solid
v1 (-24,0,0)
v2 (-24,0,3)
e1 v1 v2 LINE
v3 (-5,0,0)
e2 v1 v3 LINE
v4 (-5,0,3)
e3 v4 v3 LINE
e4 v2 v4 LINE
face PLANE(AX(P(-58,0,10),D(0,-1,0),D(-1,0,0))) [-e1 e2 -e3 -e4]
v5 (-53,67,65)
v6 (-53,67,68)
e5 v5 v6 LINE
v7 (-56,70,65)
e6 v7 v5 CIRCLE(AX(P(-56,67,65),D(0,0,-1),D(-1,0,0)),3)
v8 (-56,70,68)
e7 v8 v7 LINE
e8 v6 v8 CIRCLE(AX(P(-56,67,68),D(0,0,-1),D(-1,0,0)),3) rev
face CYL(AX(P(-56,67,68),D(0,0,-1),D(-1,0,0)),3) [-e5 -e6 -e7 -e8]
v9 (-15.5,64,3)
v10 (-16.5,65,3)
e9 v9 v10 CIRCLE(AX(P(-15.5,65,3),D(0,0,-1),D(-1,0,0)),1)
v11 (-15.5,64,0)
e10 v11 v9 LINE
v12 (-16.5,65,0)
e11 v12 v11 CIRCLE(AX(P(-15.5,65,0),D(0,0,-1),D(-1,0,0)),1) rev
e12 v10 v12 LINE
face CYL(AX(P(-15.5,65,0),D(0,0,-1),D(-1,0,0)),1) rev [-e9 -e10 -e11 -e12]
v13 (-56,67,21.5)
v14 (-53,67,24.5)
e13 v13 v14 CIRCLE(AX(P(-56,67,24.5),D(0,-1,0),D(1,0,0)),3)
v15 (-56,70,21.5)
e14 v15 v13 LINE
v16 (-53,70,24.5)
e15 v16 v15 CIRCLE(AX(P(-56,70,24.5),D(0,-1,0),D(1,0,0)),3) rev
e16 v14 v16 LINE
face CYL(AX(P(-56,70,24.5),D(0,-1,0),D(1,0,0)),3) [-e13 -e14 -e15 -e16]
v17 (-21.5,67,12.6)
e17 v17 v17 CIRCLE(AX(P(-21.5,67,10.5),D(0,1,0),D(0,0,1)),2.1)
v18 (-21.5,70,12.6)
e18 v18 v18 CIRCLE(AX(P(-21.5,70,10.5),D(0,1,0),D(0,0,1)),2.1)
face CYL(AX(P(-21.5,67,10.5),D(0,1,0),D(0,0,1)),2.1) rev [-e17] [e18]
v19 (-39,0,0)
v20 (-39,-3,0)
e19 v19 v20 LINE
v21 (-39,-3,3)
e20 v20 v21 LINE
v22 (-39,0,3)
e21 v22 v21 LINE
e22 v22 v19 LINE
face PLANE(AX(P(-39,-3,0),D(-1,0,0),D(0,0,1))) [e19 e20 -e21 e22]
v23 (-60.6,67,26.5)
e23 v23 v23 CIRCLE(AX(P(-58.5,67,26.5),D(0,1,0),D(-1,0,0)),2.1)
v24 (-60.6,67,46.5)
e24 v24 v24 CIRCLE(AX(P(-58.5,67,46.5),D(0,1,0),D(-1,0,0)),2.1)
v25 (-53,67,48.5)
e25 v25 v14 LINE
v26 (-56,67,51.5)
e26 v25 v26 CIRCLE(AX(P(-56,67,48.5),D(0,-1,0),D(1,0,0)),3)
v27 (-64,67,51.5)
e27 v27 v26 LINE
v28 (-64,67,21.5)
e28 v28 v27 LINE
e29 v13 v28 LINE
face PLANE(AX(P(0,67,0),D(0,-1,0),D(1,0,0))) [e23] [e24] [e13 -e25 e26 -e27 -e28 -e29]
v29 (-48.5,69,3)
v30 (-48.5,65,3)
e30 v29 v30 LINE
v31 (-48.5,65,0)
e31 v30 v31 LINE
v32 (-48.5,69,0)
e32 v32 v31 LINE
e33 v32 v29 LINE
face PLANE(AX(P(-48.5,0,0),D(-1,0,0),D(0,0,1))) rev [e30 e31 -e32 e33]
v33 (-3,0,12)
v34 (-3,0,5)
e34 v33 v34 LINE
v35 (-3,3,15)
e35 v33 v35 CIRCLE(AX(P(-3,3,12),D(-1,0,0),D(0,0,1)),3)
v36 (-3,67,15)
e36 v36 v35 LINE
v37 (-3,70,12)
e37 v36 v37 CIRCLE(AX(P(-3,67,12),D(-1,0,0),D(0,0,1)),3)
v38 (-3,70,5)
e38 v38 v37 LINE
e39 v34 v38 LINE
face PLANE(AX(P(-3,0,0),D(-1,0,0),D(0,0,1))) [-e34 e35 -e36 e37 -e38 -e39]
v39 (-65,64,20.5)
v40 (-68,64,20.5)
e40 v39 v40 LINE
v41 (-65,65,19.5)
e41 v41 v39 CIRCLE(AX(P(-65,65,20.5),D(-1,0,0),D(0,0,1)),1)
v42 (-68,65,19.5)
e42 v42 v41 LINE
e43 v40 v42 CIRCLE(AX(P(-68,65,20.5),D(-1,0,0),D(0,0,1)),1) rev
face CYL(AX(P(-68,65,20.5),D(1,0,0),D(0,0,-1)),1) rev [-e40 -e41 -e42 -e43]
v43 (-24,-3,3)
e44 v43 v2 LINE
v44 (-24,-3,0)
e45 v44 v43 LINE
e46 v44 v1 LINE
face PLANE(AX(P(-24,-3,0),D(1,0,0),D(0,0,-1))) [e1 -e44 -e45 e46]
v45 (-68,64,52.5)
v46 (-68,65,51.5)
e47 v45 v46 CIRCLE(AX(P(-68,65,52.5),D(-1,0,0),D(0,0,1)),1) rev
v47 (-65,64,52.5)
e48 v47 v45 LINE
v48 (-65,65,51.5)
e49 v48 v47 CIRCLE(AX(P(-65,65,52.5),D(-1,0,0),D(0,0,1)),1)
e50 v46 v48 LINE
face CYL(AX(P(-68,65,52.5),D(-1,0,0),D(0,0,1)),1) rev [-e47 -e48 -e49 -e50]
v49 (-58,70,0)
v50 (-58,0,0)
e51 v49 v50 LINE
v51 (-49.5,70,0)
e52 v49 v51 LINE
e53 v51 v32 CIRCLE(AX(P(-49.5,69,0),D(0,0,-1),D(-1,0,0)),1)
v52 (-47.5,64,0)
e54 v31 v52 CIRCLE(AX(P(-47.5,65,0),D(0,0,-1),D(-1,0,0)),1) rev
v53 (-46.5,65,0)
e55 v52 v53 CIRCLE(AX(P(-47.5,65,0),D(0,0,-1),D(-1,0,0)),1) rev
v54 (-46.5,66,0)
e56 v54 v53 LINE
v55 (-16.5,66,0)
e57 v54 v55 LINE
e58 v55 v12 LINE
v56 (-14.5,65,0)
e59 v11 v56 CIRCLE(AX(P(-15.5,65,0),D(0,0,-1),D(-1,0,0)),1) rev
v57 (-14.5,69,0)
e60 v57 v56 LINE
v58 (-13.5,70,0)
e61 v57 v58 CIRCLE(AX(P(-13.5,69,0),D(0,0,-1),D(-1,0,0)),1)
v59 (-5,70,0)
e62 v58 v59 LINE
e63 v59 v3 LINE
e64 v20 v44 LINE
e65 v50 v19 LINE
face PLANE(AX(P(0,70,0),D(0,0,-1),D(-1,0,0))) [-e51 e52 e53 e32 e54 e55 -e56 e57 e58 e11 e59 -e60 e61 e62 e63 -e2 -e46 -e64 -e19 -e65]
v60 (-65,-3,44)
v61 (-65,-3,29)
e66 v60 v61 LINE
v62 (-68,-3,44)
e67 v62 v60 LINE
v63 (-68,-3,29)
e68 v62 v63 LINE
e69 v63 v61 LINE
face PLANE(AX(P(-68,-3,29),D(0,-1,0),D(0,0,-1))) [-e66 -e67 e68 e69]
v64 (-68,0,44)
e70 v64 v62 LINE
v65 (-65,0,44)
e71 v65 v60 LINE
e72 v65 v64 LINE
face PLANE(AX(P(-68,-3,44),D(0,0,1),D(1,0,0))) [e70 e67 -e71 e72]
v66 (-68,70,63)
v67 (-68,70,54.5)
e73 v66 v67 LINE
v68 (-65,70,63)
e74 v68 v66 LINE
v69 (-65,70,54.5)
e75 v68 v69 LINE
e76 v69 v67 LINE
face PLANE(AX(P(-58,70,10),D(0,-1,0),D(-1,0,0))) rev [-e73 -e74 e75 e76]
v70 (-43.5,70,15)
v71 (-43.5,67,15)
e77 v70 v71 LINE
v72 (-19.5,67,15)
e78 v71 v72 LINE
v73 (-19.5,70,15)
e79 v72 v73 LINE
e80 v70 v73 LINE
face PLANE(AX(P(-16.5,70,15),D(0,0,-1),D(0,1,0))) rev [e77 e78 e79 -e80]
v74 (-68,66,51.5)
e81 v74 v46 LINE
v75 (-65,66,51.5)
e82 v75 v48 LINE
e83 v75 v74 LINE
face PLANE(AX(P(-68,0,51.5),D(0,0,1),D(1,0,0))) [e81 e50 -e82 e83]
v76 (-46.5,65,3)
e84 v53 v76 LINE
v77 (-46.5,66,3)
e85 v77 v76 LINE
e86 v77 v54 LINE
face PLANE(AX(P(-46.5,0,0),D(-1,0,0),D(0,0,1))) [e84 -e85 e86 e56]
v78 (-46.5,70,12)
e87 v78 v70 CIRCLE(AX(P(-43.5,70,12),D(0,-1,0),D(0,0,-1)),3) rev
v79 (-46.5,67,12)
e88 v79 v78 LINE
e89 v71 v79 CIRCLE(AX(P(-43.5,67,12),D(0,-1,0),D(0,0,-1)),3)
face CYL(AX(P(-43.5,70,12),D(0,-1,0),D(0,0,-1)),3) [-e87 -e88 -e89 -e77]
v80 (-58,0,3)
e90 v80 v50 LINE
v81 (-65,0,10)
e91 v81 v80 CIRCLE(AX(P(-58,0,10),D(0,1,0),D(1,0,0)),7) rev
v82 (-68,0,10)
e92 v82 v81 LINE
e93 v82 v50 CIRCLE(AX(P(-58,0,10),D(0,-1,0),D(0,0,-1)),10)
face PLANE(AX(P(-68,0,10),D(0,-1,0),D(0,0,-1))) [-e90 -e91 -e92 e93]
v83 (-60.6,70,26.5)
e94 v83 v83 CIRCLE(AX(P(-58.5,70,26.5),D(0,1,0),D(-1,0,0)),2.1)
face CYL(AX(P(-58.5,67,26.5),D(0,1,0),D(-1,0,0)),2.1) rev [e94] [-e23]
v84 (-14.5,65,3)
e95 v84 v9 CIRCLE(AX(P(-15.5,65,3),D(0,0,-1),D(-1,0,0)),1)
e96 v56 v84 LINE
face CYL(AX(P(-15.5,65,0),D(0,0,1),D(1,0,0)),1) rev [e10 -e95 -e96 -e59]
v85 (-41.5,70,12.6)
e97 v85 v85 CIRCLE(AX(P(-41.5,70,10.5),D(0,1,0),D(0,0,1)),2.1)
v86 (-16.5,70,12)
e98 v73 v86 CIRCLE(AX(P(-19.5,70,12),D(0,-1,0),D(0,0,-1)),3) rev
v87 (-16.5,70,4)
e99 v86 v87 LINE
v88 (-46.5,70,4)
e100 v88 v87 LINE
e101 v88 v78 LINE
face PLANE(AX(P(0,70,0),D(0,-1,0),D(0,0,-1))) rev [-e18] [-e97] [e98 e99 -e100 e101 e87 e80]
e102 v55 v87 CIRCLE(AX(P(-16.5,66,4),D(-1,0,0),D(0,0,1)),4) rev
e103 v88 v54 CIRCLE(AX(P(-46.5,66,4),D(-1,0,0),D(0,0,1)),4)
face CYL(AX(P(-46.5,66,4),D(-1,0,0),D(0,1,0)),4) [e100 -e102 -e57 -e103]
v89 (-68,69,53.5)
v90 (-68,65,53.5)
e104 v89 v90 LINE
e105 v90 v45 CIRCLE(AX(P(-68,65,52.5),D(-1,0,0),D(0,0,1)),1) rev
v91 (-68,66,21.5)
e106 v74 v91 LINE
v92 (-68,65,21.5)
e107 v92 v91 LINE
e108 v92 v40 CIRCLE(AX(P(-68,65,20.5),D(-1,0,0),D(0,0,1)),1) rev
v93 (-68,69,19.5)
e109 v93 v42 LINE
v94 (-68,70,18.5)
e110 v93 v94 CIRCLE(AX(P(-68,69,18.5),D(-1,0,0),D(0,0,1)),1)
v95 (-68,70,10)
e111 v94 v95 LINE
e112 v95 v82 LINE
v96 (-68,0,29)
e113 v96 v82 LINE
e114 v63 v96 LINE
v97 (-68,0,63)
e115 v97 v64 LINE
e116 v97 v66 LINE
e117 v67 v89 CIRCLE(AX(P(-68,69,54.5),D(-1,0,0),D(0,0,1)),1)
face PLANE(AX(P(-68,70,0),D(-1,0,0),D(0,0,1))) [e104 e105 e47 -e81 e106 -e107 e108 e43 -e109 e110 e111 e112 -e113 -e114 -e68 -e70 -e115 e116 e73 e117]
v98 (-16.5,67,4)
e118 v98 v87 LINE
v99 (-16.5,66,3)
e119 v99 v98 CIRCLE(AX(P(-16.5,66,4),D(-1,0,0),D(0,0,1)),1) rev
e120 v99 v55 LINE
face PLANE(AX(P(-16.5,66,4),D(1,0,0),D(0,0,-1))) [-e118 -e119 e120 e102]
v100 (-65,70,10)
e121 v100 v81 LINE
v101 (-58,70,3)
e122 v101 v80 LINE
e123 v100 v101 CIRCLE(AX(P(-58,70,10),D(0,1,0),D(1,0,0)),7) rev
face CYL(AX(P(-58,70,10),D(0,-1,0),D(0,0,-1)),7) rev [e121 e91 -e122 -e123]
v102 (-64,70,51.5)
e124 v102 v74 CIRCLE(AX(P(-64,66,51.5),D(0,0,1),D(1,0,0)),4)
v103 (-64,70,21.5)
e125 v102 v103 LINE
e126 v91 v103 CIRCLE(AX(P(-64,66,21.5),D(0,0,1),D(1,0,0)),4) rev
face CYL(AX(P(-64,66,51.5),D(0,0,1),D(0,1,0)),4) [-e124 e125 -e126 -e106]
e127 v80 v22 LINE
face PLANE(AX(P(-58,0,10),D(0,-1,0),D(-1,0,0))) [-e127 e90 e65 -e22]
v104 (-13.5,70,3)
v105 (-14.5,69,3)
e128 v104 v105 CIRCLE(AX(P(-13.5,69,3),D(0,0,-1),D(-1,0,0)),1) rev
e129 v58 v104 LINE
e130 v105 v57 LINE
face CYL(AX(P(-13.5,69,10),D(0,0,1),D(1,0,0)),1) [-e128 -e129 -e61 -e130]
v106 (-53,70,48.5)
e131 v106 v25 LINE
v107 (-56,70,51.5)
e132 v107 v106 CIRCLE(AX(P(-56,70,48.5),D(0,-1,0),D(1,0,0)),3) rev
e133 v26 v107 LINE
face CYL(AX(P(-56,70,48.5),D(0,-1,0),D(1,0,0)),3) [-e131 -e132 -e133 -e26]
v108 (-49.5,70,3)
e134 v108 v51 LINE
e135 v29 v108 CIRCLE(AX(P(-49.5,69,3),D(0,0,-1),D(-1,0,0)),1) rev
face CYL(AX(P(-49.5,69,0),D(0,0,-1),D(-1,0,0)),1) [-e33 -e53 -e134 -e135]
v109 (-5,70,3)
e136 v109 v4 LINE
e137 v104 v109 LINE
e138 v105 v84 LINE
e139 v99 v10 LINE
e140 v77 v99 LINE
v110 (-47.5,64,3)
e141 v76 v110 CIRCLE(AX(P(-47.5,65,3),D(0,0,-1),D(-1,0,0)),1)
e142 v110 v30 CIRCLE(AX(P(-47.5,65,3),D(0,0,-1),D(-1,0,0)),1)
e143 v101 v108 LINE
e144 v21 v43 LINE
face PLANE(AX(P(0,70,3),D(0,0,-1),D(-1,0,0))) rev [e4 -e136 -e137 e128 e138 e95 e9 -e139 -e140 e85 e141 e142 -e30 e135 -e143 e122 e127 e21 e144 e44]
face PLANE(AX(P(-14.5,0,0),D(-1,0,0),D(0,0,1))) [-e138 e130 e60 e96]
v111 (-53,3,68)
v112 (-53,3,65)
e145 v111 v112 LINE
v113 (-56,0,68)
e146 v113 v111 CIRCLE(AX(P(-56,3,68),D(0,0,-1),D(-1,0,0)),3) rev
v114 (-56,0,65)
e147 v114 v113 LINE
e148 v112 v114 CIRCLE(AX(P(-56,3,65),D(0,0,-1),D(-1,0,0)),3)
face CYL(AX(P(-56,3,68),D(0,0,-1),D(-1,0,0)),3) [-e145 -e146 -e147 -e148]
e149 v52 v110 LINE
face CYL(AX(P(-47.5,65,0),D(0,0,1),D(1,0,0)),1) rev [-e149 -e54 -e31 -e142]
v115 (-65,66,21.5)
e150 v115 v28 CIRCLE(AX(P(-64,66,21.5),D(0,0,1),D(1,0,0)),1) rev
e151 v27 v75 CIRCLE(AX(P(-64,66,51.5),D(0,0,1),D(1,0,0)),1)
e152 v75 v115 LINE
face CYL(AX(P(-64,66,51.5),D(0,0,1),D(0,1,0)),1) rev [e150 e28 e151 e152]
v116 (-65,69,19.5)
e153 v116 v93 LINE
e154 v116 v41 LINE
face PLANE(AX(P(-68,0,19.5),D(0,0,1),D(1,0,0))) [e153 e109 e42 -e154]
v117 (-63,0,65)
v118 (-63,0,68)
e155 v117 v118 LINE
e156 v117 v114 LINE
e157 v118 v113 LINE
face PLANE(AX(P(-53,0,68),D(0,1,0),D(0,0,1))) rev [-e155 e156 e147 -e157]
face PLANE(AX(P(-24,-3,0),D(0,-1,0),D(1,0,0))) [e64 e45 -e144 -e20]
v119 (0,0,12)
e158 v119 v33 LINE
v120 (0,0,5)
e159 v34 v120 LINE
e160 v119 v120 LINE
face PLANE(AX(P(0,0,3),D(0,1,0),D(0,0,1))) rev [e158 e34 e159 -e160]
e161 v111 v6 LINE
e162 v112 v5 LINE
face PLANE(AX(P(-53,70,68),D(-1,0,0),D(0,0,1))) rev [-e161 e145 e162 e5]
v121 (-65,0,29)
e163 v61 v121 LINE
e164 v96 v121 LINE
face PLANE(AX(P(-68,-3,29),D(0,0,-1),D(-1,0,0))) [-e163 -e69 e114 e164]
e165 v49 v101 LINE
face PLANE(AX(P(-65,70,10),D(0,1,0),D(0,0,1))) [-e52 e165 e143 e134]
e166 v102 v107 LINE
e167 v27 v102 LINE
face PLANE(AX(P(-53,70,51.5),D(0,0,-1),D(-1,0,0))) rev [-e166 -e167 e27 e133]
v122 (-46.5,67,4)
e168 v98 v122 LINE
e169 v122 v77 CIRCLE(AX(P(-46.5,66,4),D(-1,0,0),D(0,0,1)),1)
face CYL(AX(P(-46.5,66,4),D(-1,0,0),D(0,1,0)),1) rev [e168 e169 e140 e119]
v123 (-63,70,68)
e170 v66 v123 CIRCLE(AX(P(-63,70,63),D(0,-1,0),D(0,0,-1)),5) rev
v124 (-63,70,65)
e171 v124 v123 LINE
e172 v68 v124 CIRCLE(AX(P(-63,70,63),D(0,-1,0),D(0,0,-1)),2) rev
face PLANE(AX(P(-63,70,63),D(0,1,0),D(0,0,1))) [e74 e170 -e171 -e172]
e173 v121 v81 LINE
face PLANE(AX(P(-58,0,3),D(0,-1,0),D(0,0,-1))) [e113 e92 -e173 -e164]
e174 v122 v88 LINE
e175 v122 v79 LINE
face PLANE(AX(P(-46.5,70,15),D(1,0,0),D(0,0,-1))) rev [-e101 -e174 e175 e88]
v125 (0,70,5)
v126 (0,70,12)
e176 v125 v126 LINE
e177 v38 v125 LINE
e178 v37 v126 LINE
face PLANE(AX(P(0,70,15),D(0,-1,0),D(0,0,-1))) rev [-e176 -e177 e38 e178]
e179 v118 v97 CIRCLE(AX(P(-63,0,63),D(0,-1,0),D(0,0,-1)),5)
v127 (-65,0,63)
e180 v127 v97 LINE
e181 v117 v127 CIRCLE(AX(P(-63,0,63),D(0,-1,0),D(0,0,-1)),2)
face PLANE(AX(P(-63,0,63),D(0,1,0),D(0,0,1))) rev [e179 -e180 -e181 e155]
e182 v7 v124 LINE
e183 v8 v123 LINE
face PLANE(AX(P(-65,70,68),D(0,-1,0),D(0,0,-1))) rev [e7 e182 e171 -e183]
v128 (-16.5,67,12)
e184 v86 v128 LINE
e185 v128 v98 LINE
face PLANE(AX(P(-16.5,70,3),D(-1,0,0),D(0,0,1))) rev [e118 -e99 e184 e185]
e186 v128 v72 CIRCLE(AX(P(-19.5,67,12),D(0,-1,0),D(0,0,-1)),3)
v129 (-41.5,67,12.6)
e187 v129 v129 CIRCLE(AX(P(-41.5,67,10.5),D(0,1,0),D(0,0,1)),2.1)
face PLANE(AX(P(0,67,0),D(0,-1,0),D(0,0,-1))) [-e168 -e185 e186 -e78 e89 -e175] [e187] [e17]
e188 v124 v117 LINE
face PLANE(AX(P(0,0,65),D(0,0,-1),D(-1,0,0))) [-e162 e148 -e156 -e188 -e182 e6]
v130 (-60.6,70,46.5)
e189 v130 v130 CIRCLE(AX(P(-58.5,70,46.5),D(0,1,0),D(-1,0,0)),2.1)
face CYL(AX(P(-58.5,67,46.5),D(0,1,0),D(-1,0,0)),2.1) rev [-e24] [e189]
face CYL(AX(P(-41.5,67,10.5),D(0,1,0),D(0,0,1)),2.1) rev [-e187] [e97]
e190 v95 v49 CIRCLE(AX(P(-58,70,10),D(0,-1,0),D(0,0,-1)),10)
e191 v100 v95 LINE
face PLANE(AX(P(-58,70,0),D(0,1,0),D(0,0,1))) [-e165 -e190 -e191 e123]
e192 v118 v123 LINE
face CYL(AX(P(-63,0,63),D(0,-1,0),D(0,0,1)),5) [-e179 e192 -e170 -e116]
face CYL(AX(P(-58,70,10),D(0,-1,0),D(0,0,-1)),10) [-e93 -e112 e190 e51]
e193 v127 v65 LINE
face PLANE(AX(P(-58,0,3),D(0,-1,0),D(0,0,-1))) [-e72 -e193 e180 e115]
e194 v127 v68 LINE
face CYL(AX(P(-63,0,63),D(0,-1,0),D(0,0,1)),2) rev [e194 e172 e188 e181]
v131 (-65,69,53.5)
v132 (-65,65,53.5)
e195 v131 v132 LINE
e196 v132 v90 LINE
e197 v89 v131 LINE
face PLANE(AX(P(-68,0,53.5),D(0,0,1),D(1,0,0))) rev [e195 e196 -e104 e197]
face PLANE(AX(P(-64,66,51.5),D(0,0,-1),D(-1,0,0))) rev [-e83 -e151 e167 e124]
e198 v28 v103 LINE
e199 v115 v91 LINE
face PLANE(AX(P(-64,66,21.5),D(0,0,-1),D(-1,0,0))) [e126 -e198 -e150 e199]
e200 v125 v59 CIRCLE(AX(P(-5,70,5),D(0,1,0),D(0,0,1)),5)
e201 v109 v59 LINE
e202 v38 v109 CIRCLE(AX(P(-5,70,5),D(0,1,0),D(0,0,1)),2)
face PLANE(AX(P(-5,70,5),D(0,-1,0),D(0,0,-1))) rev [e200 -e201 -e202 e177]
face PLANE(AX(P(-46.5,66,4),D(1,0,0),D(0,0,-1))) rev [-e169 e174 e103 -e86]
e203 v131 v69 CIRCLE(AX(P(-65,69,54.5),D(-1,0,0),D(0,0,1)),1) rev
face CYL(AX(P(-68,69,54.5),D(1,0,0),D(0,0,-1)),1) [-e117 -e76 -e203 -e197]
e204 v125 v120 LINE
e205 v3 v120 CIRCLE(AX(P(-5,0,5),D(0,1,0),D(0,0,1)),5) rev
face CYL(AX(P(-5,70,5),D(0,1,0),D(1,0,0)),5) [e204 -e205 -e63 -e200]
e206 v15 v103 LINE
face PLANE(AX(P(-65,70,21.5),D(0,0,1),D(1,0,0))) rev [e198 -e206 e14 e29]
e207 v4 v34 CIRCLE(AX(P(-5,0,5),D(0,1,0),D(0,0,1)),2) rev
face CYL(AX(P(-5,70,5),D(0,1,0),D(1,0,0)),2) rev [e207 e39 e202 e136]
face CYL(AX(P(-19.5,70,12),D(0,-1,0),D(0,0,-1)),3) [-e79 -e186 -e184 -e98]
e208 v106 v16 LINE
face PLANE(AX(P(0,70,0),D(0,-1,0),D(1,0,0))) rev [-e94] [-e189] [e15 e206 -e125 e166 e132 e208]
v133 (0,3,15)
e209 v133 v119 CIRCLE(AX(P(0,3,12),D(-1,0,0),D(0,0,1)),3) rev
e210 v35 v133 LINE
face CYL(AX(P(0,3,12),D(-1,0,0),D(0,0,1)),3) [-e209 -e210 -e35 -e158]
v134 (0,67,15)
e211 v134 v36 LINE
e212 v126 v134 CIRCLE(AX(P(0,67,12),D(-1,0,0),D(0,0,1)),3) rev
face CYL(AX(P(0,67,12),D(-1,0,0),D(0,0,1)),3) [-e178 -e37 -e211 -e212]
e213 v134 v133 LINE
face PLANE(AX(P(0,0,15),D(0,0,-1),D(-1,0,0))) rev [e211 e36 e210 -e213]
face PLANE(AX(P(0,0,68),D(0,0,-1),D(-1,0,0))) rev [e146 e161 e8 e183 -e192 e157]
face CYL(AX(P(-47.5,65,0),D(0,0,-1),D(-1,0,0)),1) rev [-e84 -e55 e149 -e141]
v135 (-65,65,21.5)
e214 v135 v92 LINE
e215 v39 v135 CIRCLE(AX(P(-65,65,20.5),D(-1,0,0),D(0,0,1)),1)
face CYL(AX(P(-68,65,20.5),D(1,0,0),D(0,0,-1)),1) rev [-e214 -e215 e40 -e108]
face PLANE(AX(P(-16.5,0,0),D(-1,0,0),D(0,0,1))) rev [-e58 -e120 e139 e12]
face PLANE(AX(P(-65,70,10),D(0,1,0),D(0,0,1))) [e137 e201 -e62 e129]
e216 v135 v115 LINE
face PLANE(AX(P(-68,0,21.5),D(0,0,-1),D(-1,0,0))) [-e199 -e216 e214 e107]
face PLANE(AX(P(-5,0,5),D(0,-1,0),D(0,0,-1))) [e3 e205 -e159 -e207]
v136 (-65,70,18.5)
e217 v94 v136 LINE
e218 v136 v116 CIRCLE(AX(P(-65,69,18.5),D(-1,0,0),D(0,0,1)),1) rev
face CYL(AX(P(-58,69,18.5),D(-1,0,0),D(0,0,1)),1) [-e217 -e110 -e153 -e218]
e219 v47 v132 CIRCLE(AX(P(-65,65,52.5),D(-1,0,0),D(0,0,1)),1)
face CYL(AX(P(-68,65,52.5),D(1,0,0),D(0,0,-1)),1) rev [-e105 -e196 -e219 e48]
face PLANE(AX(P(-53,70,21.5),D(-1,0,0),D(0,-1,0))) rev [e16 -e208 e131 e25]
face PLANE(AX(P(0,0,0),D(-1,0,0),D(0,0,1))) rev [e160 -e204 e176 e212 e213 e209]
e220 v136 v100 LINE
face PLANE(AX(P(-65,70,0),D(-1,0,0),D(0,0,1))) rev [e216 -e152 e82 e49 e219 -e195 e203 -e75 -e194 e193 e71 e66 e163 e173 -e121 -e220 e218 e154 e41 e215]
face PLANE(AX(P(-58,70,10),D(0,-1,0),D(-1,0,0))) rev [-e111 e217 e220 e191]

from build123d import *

# Parameters (mm, degrees)
BASE_FLANGE1_DEPTH           = 70
EDGE_FLANGE1_STRIP_W         = 16
EDGE_FLANGE1_STRIP_H         = 3
EDGE_FLANGE1_STRIP_CUT_DEPTH = 70
EDGE_FLANGE1_DEPTH           = 70
EDGE_FLANGE2_STRIP_W         = 16
EDGE_FLANGE2_STRIP_H         = 3
EDGE_FLANGE2_STRIP_CUT_DEPTH = 70
EDGE_FLANGE2_DEPTH           = 70
SKETCH19_W                   = 15
SKETCH19_H                   = 6
BOSS_EXTRUDE1_DEPTH          = 3
SKETCH20_W                   = 15
SKETCH20_H                   = 6
BOSS_EXTRUDE2_DEPTH          = 3
CUT_EXTRUDE6_DEPTH           = 3
EDGE_FLANGE8_STRIP_W         = 14
EDGE_FLANGE8_STRIP_H         = 3
EDGE_FLANGE8_STRIP_CUT_DEPTH = 30
EDGE_FLANGE8_DEPTH           = 30
SKETCH71_R                   = 2.1
CUT_EXTRUDE7_DEPTH           = 3
CUT_EXTRUDE8_DEPTH           = 3
EDGE_FLANGE9_STRIP_W         = 14
EDGE_FLANGE9_STRIP_H         = 3
EDGE_FLANGE9_STRIP_CUT_DEPTH = 30
EDGE_FLANGE9_DEPTH           = 30
SKETCH77_R                   = 2.1
CUT_EXTRUDE9_DEPTH           = 3
FILLET1_R                    = 1
FILLET2_R                    = 3


# Sheet-metal steps are written as plain solids
with BuildPart() as part:
    # Sketch1 → Base-Flange1 (new body)
    with BuildSketch(Plane(origin=(0, 0, 0), x_dir=(1, 0, 0), z_dir=(0, 1, 0))):
        with BuildLine():
            Line((0, 0), (-58, 0))
            ThreePointArc((-58, 0), (-65.071067812, -2.928932188), (-68, -10))
            Line((-68, -10), (-68, -68))
            Line((-68, -68), (-65, -68))
            Line((-65, -68), (-65, -10))
            ThreePointArc((-65, -10), (-62.949747468, -5.050252532), (-58, -3))
            Line((-58, -3), (0, -3))
            Line((0, -3), (0, 0))
        make_face()
    extrude(amount=BASE_FLANGE1_DEPTH)

    # Edge-Flange1 strip (across the edge) → Edge-Flange1 strip cut (cut)
    with BuildSketch(Plane(origin=(0, 0, 3), x_dir=(-1, 0, 0), z_dir=(0, 1, 0))):
        with Locations((-3, -1.5)):
            Rectangle(EDGE_FLANGE1_STRIP_W, EDGE_FLANGE1_STRIP_H)
    extrude(amount=EDGE_FLANGE1_STRIP_CUT_DEPTH, mode=Mode.SUBTRACT)

    # Edge-Flange1 section (across the edge) → Edge-Flange1 (add)
    with BuildSketch(Plane(origin=(0, 0, 3), x_dir=(-1, 0, 0), z_dir=(0, 1, 0))):
        with BuildLine():
            Line((0, 2), (0, 12))
            Line((0, 12), (3, 12))
            Line((3, 12), (3, 2))
            ThreePointArc((3, 2), (3.585786438, 0.585786438), (5, 0))
            Line((5, 0), (5, -3))
            ThreePointArc((5, -3), (1.464466094, -1.535533906), (0, 2))
        make_face()
    extrude(amount=EDGE_FLANGE1_DEPTH)

    # Edge-Flange2 strip (across the edge) → Edge-Flange2 strip cut (cut)
    with BuildSketch(Plane(origin=(-65, 70, 68), x_dir=(0, 0, -1), z_dir=(0, -1, 0))):
        with Locations((-3, -1.5)):
            Rectangle(EDGE_FLANGE2_STRIP_W, EDGE_FLANGE2_STRIP_H)
    extrude(amount=EDGE_FLANGE2_STRIP_CUT_DEPTH, mode=Mode.SUBTRACT)

    # Edge-Flange2 section (across the edge) → Edge-Flange2 (add)
    with BuildSketch(Plane(origin=(-65, 70, 68), x_dir=(0, 0, -1), z_dir=(0, -1, 0))):
        with BuildLine():
            Line((0, 2), (0, 12))
            Line((0, 12), (3, 12))
            Line((3, 12), (3, 2))
            ThreePointArc((3, 2), (3.585786438, 0.585786438), (5, 0))
            Line((5, 0), (5, -3))
            ThreePointArc((5, -3), (1.464466094, -1.535533906), (0, 2))
        make_face()
    extrude(amount=EDGE_FLANGE2_DEPTH)

    # Sketch19 → Boss-Extrude1 (add)
    with BuildSketch(Plane.XY.offset(3)):
        with Locations((-31.5, 0)):
            Rectangle(SKETCH19_W, SKETCH19_H)
    extrude(amount=-BOSS_EXTRUDE1_DEPTH)

    # Sketch20 → Boss-Extrude2 (add)
    with BuildSketch(Plane(origin=(-65, 0, 0), x_dir=(0, 0, -1), z_dir=(1, 0, 0))):
        with Locations((-36.5, 0)):
            Rectangle(SKETCH20_W, SKETCH20_H)
    extrude(amount=-BOSS_EXTRUDE2_DEPTH)

    # Sketch63 → Cut-Extrude6 (cut)
    with BuildSketch(Plane(origin=(-65, 0, 0), x_dir=(0, 0, -1), z_dir=(1, 0, 0))):
        Polygon((-51.5, 64), (-51.5, 67), (-51.5, 70), (-53.5, 70), (-53.5, 64), align=None)
        Polygon((-21.5, 70), (-21.5, 67), (-21.5, 64), (-19.5, 64), (-19.5, 70), align=None)
    extrude(amount=-CUT_EXTRUDE6_DEPTH, mode=Mode.SUBTRACT)

    # Edge-Flange8 strip (across the edge) → Edge-Flange8 strip cut (cut)
    with BuildSketch(Plane(origin=(-65, 70, 21.5), x_dir=(0, -1, 0), z_dir=(0, 0, 1))):
        with Locations((-3, -1.5)):
            Rectangle(EDGE_FLANGE8_STRIP_W, EDGE_FLANGE8_STRIP_H)
    extrude(amount=EDGE_FLANGE8_STRIP_CUT_DEPTH, mode=Mode.SUBTRACT)

    # Edge-Flange8 section (across the edge) → Edge-Flange8 (add)
    with BuildSketch(Plane(origin=(-65, 70, 21.5), x_dir=(0, -1, 0), z_dir=(0, 0, 1))):
        with BuildLine():
            Line((0, 1), (0, 12))
            Line((0, 12), (3, 12))
            Line((3, 12), (3, 1))
            ThreePointArc((3, 1), (3.292893219, 0.292893219), (4, 0))
            Line((4, 0), (4, -3))
            ThreePointArc((4, -3), (1.171572875, -1.828427125), (0, 1))
        make_face()
    extrude(amount=EDGE_FLANGE8_DEPTH)

    # Sketch71 → Cut-Extrude7 (cut)
    with BuildSketch(Plane(origin=(0, 70, 0), x_dir=(1, 0, 0), z_dir=(0, 1, 0))):
        with Locations(Location((-58.5, -26.5, 0), (0, 0, 180))):
            Circle(SKETCH71_R)
        with Locations(Location((-58.5, -46.5, 0), (0, 0, 180))):
            Circle(SKETCH71_R)
    extrude(amount=-CUT_EXTRUDE7_DEPTH, mode=Mode.SUBTRACT)

    # Sketch72 → Cut-Extrude8 (cut)
    with BuildSketch(Plane.XY.offset(3)):
        Polygon((-46.5, 66.882619945), (-46.5, 70), (-48.5, 70), (-48.5, 64), (-46.5, 64), align=None)
        Polygon((-14.5, 70), (-16.5, 70), (-16.5, 66.882619945), (-16.5, 64), (-14.5, 64), align=None)
    extrude(amount=-CUT_EXTRUDE8_DEPTH, mode=Mode.SUBTRACT)

    # Edge-Flange9 strip (across the edge) → Edge-Flange9 strip cut (cut)
    with BuildSketch(Plane(origin=(-16.5, 70, 3), x_dir=(0, -1, 0), z_dir=(-1, 0, 0))):
        with Locations((-3, -1.5)):
            Rectangle(EDGE_FLANGE9_STRIP_W, EDGE_FLANGE9_STRIP_H)
    extrude(amount=EDGE_FLANGE9_STRIP_CUT_DEPTH, mode=Mode.SUBTRACT)

    # Edge-Flange9 section (across the edge) → Edge-Flange9 (add)
    with BuildSketch(Plane(origin=(-16.5, 70, 3), x_dir=(0, -1, 0), z_dir=(-1, 0, 0))):
        with BuildLine():
            Line((0, 1), (0, 12))
            Line((0, 12), (3, 12))
            Line((3, 12), (3, 1))
            ThreePointArc((3, 1), (3.292893219, 0.292893219), (4, 0))
            Line((4, 0), (4, -3))
            ThreePointArc((4, -3), (1.171572875, -1.828427125), (0, 1))
        make_face()
    extrude(amount=EDGE_FLANGE9_DEPTH)

    # Sketch77 → Cut-Extrude9 (cut)
    with BuildSketch(Plane(origin=(0, 70, 0), x_dir=(1, 0, 0), z_dir=(0, 1, 0))):
        with Locations(Location((-41.5, -10.5, 0), (0, 0, 270))):
            Circle(SKETCH77_R)
        with Locations(Location((-21.5, -10.5, 0), (0, 0, 270))):
            Circle(SKETCH77_R)
    extrude(amount=-CUT_EXTRUDE9_DEPTH, mode=Mode.SUBTRACT)

    # Fillet1
    fillet1_edges = [part.edges().sort_by_distance(p)[0] for p in [
        (-66.5, 70, 53.5),
        (-66.5, 64, 53.5),
        (-66.5, 64, 51.5),
        (-66.5, 64, 21.5),
        (-66.5, 64, 19.5),
        (-66.5, 70, 19.5),
        (-14.5, 70, 1.5),
        (-48.5, 70, 1.5),
        (-14.5, 64, 1.5),
        (-16.5, 64, 1.5),
        (-46.5, 64, 1.5),
        (-48.5, 64, 1.5),
    ]]
    fillet(fillet1_edges, radius=FILLET1_R - 0.0001)  # a hair under: the kernel refuses the full size

    # Fillet2
    fillet2_edges = [part.edges().sort_by_distance(p)[0] for p in [
        (-1.5, 70, 15),
        (-1.5, 0, 15),
        (-53, 0, 66.5),
        (-53, 70, 66.5),
        (-53, 68.5, 21.5),
        (-53, 68.5, 51.5),
        (-16.5, 68.5, 15),
        (-46.5, 68.5, 15),
    ]]
    fillet(fillet2_edges, radius=FILLET2_R)


solid = part.part
